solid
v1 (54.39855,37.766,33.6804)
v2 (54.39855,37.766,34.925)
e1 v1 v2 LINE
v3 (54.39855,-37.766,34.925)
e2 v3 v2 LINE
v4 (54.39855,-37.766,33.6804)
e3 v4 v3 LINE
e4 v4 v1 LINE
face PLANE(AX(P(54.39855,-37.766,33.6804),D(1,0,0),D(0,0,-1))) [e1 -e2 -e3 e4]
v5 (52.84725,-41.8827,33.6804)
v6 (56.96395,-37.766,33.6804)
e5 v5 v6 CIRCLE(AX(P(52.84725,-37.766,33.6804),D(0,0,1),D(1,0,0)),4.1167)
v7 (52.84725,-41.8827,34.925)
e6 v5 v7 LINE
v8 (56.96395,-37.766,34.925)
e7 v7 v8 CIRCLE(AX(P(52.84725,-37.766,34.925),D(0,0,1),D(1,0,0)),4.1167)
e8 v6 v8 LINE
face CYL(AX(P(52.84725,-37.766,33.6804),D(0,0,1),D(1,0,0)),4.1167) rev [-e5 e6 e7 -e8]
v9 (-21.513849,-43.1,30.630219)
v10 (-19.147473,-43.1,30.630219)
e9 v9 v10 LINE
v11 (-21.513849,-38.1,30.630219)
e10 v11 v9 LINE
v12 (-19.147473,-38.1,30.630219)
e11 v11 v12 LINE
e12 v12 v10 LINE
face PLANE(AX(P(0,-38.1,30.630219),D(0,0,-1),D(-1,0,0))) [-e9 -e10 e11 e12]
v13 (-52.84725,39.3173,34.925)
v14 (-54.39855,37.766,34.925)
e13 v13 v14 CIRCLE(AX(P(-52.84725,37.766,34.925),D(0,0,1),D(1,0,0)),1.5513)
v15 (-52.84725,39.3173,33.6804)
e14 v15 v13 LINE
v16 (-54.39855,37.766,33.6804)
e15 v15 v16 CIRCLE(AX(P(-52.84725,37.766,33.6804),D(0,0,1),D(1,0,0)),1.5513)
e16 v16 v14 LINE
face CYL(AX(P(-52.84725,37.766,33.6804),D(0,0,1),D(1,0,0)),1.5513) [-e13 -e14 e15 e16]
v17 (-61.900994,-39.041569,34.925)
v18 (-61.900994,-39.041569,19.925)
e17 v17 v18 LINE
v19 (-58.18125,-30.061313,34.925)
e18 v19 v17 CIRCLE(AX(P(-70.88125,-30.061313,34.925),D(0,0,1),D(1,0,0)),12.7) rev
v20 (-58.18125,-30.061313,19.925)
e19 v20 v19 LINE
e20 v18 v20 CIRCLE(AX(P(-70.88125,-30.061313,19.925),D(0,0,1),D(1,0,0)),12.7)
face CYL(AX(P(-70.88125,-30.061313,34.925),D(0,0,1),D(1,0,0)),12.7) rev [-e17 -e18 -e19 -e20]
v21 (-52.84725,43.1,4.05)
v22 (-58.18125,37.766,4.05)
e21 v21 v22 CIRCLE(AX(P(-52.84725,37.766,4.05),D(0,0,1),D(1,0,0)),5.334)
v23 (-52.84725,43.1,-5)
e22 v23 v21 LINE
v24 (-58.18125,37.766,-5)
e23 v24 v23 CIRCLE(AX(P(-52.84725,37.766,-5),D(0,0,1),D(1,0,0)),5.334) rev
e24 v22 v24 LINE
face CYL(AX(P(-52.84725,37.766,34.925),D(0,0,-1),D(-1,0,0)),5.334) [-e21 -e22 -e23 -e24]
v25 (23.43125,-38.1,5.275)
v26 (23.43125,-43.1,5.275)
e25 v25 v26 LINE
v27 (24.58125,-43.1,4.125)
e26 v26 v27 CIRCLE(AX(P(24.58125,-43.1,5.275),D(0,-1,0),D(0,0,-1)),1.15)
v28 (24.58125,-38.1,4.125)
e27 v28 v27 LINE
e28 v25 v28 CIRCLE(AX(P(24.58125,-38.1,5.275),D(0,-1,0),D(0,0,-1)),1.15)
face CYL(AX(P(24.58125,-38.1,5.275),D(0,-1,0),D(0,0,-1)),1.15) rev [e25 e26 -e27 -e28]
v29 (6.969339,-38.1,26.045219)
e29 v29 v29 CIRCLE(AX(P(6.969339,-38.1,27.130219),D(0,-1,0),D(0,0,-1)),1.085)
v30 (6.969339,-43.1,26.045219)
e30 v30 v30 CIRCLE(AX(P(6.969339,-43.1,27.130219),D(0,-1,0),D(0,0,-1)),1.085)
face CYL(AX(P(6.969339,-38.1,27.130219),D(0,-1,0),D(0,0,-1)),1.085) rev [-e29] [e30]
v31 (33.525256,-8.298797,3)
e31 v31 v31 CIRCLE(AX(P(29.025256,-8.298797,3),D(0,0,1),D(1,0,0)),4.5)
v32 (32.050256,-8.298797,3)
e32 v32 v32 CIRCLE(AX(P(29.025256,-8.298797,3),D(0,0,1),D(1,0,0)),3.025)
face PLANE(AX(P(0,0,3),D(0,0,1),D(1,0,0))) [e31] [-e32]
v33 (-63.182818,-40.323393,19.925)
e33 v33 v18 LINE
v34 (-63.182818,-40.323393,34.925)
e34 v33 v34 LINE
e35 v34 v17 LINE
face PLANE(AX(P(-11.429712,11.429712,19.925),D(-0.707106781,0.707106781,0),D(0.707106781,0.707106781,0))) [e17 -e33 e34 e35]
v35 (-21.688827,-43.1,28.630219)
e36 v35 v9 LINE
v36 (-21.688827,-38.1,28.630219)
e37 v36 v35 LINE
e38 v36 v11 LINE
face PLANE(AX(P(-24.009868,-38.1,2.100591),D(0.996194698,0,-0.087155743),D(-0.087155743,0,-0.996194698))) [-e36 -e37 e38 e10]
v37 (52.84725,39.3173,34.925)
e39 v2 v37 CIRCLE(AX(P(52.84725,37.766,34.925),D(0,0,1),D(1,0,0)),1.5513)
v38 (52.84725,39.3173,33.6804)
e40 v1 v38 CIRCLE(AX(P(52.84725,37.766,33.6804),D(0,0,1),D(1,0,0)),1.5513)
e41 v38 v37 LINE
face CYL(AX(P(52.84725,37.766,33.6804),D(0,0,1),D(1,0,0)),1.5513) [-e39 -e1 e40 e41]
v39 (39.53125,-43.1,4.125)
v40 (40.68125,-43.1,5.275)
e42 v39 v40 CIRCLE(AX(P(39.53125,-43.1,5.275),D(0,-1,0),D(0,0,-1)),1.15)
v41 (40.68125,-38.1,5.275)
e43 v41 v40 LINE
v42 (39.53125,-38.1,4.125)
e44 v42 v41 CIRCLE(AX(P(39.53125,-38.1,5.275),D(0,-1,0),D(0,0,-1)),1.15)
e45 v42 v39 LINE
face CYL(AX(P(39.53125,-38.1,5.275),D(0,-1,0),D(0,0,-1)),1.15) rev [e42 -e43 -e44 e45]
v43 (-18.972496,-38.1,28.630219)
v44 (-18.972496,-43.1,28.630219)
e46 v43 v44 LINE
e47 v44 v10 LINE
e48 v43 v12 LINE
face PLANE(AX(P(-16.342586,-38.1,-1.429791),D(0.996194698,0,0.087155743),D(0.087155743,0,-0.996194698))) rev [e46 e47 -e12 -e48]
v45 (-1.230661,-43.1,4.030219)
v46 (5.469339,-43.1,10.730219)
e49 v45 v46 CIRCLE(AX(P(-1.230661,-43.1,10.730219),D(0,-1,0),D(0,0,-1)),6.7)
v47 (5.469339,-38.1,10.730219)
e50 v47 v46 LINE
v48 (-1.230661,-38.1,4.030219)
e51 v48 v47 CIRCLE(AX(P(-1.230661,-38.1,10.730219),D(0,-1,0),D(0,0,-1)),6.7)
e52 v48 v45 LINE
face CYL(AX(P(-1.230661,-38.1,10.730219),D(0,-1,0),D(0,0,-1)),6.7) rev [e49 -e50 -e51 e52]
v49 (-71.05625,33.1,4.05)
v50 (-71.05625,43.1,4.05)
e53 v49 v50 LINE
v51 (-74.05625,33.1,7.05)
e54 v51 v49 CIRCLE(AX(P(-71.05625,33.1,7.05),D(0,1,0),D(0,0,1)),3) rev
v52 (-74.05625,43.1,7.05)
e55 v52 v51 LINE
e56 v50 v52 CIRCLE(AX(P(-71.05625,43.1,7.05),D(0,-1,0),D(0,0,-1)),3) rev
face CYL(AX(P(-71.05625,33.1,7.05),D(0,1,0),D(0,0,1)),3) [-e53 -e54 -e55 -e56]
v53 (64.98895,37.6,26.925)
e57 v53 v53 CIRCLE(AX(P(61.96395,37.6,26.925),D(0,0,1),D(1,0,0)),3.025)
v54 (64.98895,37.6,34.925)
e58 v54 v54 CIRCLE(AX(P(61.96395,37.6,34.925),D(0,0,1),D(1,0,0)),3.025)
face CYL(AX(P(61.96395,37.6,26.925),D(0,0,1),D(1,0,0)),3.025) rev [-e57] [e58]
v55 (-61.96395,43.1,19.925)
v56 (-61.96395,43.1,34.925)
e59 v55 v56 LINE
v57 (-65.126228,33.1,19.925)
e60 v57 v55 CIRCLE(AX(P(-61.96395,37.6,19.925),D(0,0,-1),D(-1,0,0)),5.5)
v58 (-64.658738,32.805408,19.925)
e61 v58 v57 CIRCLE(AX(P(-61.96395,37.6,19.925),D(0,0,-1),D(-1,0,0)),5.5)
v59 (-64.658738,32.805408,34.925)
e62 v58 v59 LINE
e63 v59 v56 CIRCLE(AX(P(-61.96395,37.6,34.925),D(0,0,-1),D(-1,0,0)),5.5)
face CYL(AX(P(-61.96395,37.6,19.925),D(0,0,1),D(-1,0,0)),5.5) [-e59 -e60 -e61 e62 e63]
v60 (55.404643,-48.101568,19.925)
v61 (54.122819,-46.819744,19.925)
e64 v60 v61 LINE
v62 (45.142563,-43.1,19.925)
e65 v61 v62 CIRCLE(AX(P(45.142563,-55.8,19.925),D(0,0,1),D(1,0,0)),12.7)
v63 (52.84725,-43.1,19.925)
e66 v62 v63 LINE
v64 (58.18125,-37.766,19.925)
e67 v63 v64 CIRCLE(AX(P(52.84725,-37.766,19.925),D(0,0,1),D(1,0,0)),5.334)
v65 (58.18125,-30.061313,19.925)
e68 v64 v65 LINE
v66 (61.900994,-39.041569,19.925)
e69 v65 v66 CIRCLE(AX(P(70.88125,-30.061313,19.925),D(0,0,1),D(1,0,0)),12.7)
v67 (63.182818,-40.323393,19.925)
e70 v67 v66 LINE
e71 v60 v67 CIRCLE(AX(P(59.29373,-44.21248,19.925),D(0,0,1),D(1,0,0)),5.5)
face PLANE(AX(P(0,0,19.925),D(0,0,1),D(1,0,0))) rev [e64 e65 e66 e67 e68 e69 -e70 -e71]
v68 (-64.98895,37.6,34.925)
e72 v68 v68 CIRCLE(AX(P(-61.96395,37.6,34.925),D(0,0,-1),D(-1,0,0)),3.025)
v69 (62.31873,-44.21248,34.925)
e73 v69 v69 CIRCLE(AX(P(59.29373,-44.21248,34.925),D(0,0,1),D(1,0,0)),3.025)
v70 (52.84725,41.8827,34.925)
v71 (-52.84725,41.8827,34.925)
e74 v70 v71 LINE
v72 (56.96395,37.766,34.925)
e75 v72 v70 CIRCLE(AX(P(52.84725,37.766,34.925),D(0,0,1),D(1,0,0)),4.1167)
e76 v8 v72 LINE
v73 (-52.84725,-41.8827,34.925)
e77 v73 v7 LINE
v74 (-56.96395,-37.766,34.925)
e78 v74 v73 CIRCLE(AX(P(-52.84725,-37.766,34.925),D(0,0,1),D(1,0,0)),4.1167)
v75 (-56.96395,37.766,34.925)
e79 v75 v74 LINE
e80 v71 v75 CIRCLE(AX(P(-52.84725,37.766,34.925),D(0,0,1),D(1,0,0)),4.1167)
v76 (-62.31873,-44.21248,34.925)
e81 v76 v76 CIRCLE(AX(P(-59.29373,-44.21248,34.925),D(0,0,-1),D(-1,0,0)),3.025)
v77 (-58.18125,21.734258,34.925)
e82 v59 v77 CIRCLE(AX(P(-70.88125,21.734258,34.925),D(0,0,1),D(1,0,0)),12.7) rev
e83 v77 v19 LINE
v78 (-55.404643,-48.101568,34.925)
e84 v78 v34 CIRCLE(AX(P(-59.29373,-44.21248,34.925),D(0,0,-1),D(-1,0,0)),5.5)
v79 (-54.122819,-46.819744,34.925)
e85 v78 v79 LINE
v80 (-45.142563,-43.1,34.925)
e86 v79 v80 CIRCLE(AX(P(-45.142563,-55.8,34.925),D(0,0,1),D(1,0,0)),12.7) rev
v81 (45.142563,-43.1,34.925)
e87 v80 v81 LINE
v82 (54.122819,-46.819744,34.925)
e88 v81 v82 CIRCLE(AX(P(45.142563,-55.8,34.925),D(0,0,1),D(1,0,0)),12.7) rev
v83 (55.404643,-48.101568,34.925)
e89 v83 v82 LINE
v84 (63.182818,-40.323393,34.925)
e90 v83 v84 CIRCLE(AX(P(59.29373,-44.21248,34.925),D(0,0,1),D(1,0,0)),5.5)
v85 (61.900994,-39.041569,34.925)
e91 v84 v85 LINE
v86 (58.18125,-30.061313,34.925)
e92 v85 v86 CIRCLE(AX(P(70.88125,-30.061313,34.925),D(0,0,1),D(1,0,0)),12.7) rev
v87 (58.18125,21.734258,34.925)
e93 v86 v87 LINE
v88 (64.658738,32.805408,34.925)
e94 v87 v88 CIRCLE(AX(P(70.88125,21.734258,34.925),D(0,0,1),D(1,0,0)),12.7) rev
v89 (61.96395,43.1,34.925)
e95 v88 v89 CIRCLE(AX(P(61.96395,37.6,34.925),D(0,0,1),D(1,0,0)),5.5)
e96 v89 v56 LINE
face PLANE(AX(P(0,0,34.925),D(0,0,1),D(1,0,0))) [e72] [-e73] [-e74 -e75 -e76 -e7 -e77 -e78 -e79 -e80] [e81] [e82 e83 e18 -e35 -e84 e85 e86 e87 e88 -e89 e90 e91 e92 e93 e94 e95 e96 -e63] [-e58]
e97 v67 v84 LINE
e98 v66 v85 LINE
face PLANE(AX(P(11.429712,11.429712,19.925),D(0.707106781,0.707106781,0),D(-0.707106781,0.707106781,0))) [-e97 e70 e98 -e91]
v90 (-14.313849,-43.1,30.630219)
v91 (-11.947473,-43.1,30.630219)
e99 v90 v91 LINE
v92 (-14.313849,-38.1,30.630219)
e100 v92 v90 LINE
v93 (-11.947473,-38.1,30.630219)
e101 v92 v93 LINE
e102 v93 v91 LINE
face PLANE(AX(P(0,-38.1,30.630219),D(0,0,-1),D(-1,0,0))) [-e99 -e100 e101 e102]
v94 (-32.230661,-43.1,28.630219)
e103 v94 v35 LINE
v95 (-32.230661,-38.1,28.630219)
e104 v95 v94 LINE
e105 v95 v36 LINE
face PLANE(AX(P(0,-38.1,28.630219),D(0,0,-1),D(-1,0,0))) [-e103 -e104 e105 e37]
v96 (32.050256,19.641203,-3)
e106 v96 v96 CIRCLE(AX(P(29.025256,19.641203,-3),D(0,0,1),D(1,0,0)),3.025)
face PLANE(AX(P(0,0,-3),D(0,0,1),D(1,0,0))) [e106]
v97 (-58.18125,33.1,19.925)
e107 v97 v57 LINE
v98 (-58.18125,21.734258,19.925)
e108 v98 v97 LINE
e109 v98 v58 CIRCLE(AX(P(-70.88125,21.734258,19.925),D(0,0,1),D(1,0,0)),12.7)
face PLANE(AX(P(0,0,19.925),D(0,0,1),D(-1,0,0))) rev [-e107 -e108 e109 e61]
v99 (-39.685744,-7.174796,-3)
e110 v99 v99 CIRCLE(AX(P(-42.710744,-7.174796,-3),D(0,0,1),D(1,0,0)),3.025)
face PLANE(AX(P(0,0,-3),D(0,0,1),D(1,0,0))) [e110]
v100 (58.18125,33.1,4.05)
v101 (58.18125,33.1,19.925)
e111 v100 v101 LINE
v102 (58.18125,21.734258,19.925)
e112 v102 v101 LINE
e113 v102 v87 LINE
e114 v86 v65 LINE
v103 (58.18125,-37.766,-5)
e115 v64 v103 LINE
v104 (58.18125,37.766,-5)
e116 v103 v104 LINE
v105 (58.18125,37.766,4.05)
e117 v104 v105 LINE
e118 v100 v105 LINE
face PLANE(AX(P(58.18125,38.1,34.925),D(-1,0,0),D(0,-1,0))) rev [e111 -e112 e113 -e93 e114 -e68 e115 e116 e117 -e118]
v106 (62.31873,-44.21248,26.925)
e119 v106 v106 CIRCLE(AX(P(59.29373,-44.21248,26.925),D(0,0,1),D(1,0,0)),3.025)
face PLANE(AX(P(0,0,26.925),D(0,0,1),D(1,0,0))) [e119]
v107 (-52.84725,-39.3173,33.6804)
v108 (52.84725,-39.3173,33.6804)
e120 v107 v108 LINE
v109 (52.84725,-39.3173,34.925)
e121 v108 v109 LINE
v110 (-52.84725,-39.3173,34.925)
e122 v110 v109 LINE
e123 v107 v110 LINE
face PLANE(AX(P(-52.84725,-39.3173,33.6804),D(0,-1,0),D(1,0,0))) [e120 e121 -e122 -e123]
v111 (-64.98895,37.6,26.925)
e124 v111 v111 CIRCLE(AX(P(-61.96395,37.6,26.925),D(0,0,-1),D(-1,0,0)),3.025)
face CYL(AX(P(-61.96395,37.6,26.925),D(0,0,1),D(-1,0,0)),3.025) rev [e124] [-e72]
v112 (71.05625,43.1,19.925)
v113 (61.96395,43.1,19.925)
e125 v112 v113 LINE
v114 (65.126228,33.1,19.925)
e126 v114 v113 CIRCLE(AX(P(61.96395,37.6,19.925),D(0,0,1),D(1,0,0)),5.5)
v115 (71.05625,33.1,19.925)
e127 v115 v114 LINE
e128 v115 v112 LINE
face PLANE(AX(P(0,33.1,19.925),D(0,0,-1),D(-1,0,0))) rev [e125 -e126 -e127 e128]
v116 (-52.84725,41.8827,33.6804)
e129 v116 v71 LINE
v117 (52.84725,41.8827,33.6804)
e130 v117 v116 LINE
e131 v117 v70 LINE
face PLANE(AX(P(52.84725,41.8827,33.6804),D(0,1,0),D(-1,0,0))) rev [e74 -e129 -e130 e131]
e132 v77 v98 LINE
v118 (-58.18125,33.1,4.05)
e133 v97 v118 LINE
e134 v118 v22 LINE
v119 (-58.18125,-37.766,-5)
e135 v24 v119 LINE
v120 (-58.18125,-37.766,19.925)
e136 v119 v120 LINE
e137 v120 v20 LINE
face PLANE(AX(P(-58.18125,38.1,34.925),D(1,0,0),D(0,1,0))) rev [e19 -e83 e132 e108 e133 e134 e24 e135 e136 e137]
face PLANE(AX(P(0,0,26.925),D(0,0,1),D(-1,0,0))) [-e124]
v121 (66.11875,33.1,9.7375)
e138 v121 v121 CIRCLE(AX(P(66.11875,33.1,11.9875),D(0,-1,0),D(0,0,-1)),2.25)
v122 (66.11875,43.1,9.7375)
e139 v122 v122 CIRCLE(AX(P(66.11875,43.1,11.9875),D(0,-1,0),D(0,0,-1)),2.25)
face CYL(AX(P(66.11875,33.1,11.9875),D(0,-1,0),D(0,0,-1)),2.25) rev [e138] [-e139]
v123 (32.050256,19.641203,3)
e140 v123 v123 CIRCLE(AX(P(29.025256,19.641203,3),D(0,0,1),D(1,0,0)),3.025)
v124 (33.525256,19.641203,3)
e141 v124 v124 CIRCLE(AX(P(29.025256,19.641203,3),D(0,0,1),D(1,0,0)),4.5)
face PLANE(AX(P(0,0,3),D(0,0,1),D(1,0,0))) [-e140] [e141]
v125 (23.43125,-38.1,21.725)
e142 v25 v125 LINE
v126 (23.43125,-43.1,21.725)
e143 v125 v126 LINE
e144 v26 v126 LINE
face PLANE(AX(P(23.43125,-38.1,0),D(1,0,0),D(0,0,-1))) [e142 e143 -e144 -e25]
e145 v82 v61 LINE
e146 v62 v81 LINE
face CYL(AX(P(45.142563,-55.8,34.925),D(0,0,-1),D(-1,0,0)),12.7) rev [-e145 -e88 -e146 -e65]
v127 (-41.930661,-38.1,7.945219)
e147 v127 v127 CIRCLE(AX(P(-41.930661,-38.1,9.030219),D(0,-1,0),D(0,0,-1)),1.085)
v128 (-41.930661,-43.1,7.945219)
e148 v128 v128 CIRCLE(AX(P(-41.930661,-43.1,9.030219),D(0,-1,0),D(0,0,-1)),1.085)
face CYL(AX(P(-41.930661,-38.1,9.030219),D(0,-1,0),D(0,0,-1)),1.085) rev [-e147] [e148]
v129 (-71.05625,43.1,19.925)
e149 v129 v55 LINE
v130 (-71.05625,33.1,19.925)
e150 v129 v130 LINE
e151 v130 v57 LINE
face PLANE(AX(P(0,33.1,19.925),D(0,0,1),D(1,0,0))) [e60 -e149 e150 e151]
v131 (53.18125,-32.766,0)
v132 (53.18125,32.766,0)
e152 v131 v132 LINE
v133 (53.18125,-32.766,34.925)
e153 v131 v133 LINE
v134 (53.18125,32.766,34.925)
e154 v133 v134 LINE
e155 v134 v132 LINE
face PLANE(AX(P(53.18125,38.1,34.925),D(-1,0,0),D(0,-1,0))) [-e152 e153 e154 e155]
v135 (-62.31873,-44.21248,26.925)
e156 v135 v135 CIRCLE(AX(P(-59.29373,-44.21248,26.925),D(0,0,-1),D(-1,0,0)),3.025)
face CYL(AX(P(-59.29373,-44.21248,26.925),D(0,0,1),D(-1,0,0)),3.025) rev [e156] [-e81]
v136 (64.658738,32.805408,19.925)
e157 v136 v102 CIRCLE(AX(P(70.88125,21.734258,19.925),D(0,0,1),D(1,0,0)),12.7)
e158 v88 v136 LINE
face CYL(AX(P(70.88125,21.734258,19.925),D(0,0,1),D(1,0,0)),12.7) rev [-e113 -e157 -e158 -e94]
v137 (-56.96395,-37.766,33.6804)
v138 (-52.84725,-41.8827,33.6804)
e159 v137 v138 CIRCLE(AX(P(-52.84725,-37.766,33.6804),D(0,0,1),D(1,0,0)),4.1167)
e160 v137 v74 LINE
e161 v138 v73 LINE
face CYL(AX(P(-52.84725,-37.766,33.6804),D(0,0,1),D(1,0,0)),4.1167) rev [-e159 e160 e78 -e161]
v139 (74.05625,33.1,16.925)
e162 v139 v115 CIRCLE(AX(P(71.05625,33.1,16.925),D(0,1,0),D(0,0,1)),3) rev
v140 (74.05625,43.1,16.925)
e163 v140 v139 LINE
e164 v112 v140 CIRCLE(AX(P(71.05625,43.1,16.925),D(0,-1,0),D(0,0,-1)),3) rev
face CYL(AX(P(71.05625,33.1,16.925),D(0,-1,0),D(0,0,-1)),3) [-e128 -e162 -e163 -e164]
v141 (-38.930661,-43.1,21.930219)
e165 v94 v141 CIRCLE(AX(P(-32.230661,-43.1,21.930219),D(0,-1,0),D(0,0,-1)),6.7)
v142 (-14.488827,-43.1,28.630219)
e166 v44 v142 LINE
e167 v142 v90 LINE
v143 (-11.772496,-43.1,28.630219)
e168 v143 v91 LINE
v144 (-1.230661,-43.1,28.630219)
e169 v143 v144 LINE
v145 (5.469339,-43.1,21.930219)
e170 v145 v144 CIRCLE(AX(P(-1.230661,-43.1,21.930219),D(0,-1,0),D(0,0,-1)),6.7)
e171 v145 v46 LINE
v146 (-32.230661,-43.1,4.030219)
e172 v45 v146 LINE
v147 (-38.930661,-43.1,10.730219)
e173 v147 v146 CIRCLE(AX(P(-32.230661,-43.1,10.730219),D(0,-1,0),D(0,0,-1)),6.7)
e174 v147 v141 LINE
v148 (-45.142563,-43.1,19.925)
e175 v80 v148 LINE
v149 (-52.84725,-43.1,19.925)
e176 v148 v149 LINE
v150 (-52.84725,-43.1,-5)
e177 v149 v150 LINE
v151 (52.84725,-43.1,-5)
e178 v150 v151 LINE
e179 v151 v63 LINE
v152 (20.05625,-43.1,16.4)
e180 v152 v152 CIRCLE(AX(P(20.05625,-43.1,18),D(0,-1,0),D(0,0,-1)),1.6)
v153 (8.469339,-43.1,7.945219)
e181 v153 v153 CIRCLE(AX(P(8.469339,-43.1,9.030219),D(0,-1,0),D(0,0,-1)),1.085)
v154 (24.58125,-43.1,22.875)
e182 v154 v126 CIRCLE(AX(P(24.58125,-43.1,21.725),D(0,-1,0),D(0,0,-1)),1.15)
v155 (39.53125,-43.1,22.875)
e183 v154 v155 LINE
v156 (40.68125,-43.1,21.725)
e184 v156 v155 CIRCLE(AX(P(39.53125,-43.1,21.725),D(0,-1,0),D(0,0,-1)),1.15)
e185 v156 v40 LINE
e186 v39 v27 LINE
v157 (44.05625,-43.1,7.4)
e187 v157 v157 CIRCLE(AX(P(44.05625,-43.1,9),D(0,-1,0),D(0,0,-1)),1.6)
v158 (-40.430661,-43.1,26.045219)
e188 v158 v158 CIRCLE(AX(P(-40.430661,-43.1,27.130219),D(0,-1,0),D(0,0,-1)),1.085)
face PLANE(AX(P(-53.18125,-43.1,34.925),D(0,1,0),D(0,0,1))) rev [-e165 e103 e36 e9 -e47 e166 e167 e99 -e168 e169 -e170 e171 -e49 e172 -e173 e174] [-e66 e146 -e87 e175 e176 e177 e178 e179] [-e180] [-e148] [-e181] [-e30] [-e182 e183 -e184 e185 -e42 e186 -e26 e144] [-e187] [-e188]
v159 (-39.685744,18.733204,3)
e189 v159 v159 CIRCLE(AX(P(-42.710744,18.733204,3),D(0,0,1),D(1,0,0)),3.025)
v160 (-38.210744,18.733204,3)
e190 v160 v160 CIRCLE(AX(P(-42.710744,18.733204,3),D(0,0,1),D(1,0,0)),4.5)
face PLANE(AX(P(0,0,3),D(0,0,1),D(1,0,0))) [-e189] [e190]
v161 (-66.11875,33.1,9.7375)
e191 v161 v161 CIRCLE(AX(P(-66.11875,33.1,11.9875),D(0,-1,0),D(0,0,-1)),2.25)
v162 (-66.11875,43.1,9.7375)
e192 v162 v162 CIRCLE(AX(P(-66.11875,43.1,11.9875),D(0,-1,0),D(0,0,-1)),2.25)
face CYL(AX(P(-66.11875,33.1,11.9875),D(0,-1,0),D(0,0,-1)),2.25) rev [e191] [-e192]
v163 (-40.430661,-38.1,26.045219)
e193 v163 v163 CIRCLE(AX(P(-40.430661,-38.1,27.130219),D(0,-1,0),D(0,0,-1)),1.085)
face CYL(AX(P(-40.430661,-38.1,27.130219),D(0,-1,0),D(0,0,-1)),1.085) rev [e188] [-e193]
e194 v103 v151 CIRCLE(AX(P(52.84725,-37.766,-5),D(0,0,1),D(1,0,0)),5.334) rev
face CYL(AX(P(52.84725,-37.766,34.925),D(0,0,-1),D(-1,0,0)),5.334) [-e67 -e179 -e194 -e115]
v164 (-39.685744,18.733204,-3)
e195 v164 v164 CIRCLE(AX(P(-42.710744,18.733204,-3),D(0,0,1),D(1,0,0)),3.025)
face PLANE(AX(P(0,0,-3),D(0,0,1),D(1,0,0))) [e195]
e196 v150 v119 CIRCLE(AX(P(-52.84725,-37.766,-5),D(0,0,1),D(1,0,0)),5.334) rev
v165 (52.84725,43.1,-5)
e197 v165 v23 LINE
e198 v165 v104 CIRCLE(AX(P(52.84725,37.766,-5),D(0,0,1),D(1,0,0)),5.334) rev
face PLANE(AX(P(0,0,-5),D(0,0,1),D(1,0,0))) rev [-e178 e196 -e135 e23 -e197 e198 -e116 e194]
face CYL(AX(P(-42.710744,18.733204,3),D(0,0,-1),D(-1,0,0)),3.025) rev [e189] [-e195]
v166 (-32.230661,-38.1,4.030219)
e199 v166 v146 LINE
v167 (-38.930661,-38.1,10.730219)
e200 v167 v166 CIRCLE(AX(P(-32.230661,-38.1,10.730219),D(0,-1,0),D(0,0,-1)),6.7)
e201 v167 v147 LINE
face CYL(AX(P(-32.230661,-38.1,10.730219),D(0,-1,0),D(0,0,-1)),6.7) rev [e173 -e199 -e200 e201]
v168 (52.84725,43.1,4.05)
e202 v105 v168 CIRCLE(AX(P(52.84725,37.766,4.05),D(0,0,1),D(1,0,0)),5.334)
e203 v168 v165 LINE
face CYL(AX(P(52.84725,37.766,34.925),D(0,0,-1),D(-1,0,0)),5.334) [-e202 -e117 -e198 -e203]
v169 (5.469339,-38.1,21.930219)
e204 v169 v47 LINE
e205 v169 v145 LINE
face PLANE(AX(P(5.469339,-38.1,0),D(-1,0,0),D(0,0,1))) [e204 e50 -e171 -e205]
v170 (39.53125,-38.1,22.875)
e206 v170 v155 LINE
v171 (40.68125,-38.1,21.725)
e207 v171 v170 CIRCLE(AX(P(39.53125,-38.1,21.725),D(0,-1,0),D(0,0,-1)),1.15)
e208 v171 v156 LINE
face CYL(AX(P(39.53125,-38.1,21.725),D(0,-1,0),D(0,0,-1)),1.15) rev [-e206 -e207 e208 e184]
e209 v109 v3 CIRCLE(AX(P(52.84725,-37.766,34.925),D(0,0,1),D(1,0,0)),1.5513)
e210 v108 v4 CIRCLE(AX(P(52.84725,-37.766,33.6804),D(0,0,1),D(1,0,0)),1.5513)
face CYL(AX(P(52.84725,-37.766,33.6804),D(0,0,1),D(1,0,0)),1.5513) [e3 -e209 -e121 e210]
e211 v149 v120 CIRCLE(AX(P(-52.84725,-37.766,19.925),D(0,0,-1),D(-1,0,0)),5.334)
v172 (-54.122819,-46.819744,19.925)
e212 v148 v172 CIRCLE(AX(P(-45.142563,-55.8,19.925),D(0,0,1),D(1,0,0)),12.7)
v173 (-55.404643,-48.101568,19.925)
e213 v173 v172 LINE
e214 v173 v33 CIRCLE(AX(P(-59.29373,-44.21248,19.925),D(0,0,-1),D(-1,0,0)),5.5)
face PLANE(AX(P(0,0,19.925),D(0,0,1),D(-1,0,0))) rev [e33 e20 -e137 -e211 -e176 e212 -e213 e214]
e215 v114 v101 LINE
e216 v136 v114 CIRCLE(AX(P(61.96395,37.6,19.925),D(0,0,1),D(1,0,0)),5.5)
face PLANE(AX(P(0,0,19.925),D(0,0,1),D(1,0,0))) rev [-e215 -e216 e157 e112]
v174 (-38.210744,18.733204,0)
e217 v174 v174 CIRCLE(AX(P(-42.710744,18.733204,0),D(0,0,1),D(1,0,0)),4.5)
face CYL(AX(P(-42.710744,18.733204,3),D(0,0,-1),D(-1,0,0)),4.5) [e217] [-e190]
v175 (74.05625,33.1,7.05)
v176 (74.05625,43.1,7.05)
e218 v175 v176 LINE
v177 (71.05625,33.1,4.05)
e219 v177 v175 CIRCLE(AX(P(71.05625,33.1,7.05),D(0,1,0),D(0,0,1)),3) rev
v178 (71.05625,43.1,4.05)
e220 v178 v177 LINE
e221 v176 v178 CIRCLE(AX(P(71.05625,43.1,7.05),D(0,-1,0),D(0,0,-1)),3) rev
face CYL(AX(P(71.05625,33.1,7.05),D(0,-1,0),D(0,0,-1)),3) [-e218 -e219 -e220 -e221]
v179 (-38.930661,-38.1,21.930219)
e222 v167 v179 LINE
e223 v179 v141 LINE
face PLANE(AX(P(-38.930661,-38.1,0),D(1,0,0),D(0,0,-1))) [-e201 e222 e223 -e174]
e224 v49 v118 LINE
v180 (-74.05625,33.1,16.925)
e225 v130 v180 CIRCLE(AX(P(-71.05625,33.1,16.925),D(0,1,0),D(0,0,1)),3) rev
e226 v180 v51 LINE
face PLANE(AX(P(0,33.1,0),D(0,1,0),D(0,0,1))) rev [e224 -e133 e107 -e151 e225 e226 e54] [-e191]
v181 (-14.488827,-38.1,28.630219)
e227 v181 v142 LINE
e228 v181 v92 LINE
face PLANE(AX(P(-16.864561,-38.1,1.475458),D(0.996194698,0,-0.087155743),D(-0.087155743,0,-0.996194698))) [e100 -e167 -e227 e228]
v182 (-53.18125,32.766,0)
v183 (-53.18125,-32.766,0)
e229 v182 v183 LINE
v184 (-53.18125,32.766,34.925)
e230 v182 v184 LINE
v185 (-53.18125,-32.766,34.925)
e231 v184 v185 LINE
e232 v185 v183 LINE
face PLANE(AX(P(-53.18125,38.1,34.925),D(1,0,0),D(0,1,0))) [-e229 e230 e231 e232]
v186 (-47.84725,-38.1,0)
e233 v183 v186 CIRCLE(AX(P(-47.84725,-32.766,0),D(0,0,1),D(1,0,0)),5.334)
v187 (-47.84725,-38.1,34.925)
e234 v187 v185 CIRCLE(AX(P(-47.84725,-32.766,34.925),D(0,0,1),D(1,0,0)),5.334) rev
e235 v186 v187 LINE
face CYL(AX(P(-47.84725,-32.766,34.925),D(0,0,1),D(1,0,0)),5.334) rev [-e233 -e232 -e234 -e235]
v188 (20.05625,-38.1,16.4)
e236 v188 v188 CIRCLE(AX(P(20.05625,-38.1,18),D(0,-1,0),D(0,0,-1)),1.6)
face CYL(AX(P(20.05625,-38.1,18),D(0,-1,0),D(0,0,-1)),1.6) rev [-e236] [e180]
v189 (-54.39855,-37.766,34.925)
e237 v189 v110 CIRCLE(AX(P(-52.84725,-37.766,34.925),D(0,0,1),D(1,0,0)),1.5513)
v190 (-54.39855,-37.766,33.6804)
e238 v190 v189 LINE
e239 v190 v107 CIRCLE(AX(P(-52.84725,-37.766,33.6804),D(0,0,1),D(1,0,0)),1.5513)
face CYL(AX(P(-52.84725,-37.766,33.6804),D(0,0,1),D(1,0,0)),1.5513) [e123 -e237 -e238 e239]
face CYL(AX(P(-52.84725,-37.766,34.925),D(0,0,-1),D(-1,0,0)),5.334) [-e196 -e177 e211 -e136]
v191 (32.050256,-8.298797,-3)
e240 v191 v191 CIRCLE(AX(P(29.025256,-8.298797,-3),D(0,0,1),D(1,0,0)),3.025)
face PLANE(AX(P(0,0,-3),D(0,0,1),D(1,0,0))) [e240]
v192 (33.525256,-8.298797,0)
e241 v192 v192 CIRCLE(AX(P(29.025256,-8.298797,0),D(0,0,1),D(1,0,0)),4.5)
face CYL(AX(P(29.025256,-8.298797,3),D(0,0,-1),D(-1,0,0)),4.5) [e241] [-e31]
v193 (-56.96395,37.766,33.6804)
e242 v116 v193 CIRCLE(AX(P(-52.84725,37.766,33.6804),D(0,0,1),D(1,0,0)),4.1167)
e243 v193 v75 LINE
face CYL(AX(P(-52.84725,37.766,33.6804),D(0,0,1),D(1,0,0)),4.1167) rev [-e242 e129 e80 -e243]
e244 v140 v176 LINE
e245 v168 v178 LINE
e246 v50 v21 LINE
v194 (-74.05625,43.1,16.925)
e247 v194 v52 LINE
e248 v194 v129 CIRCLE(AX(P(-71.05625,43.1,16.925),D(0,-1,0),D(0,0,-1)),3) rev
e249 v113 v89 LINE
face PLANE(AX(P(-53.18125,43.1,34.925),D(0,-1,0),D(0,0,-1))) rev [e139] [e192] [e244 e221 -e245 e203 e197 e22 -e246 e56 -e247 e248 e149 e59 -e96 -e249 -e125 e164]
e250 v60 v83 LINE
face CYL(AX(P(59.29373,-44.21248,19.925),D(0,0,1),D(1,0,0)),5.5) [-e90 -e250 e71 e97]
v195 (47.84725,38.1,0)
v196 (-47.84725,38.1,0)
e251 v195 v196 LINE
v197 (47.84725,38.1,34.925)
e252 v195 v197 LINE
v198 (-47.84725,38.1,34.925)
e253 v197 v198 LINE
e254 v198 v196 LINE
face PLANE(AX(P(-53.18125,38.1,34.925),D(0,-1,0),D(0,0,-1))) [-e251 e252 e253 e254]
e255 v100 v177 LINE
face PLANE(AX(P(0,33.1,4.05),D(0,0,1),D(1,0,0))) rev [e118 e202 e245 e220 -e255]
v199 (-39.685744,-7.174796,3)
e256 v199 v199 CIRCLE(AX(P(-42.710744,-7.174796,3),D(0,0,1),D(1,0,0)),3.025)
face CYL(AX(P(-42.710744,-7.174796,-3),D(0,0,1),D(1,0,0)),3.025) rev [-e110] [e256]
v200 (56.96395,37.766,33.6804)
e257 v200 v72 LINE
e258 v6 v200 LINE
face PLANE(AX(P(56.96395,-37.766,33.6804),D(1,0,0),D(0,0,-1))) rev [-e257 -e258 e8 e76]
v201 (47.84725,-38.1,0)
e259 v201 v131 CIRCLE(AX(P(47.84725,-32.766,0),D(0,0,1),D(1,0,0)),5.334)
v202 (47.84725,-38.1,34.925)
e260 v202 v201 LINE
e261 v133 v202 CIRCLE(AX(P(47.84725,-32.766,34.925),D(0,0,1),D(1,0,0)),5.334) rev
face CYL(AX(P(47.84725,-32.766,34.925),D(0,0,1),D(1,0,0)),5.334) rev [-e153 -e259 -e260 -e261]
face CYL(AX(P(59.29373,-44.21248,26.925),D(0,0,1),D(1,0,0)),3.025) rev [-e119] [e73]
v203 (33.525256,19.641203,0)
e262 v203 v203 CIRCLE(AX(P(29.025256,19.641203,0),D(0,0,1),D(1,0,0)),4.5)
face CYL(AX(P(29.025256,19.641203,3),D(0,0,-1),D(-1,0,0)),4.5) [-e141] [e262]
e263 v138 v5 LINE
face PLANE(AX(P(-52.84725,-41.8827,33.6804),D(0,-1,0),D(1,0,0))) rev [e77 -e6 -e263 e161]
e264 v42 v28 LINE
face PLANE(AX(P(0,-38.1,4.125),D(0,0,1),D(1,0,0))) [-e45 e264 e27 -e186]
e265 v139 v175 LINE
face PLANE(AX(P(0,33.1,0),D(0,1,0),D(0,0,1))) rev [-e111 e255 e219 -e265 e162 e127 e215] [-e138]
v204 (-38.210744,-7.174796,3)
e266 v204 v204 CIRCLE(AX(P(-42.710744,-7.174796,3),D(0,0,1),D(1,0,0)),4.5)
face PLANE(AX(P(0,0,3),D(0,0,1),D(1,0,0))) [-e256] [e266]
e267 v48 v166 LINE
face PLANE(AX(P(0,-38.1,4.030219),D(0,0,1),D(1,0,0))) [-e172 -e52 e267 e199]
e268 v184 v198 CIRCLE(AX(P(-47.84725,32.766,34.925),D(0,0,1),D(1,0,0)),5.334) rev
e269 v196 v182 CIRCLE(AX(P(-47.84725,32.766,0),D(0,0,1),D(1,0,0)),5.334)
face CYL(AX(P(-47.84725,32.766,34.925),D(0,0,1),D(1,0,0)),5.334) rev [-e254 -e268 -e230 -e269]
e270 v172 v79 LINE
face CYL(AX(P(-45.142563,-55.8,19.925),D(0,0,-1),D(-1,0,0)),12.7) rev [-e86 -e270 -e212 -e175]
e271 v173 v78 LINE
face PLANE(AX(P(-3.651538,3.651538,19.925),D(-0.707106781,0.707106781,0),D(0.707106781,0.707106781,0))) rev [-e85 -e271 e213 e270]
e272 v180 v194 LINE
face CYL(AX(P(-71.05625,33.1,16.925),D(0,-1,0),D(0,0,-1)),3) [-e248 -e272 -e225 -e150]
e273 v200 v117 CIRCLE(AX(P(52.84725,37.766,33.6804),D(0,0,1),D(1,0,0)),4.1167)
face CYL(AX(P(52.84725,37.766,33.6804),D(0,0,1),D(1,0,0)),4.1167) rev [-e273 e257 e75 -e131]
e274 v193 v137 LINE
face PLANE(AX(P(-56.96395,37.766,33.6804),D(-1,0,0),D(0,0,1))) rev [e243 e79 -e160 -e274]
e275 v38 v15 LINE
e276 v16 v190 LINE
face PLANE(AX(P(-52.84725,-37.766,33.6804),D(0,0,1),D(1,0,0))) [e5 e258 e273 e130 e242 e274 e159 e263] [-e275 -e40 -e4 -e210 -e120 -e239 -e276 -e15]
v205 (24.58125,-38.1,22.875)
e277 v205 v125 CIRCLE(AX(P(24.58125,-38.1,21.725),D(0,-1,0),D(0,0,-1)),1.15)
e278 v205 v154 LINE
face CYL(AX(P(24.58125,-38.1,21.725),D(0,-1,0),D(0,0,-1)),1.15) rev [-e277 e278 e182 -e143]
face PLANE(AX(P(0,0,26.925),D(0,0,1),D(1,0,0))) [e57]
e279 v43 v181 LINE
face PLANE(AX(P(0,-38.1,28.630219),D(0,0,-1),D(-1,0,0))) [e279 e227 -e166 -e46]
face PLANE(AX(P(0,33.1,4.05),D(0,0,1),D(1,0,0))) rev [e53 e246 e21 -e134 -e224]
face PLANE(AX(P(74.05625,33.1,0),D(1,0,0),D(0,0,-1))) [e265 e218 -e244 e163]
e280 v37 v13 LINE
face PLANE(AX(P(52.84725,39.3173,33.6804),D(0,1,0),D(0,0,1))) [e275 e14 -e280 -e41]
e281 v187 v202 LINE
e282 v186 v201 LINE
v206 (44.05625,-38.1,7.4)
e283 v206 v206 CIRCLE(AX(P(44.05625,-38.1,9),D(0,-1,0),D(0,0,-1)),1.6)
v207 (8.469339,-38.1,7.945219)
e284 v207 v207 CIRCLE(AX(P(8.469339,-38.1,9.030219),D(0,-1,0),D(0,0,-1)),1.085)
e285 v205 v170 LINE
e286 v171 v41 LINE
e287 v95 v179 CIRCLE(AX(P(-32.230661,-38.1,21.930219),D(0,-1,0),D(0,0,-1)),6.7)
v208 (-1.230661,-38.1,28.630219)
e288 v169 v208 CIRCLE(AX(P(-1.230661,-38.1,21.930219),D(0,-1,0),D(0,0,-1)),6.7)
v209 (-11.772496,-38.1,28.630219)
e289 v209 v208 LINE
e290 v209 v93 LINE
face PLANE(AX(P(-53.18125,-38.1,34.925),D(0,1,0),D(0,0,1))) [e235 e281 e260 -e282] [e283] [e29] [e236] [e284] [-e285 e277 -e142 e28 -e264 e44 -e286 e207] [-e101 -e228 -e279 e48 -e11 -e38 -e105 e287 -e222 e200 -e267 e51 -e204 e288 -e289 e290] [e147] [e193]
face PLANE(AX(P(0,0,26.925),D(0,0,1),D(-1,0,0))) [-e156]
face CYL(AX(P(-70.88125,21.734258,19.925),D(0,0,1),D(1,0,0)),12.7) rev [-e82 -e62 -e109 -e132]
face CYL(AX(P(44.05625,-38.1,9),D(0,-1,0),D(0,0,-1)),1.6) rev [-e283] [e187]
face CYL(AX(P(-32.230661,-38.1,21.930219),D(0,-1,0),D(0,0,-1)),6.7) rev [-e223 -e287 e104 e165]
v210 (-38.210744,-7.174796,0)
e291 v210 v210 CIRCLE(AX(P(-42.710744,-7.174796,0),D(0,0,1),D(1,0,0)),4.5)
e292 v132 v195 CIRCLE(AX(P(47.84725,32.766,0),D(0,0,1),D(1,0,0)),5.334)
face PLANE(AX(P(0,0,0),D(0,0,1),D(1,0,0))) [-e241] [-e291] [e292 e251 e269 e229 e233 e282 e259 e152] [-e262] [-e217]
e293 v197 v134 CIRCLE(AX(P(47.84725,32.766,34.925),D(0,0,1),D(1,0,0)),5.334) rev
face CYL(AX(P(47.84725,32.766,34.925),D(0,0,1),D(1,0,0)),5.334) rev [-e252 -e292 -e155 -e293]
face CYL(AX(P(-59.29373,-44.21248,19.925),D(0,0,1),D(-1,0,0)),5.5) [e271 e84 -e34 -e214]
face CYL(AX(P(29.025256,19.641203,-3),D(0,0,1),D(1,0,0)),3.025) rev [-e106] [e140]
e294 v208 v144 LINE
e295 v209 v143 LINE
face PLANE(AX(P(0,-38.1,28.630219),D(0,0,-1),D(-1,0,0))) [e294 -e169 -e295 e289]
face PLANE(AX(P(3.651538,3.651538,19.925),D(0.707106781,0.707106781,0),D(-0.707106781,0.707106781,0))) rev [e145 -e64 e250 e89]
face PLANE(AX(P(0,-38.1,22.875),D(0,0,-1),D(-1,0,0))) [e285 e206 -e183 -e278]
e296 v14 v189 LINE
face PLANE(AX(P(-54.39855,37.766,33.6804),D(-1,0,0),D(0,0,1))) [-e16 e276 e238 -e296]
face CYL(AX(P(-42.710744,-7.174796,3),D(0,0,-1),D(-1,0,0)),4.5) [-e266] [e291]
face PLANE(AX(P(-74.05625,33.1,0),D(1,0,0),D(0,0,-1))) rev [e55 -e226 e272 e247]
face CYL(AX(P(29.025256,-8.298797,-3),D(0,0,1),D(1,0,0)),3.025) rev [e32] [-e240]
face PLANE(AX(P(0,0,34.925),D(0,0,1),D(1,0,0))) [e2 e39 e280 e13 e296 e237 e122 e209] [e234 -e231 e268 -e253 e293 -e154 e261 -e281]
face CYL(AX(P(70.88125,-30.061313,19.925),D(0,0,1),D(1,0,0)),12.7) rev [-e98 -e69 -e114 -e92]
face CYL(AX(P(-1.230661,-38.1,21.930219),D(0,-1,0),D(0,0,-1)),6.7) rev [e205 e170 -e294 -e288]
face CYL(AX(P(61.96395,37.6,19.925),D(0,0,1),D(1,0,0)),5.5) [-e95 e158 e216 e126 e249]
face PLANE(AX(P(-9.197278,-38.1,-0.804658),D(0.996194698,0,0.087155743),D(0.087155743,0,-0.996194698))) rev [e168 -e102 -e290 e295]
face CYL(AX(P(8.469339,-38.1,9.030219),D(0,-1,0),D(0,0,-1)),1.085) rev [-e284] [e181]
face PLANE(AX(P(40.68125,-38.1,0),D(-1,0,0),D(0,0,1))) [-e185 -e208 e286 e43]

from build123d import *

# Parameters (mm, degrees)
SKETCH1_W             = 106.3625
SKETCH1_H             = 76.2
BOSS_EXTRUDE1_DEPTH   = 34.925
SHELL1_T              = 5
FILLET1_R             = 5.334
CUT_EXTRUDE1_DEPTH    = 1.2446
BOSS_EXTRUDE2_DEPTH   = 15
BOSS_EXTRUDE2_2_DEPTH = 15
SKETCH5_R             = 3.025
CUT_EXTRUDE4_DEPTH    = 8
FILLET2_R             = 12.7
SKETCH6_R             = 4.5
SKETCH6_R_2           = 3.025
BOSS_EXTRUDE3_DEPTH   = 3
CUT_EXTRUDE5_START    = -6
SKETCH7_R             = 3.025
CUT_EXTRUDE5_DEPTH    = 6
BOSS_EXTRUDE4_DEPTH   = 10
BOSS_EXTRUDE5_REACH   = 125.767
SKETCH9_W             = 5.334
SKETCH9_H             = 15.875
FILLET3_R             = 3
BOSS_EXTRUDE6_REACH   = 125.767
SKETCH12_W            = 5.334
SKETCH12_H            = 15.875
M4_CLEARANCE_HOLE1_D  = 4.5
SKETCH13_R            = 1.6
CUT_EXTRUDE6_DEPTH    = 5


with BuildPart() as part:
    # Sketch1 → Boss-Extrude1 (new body)
    with BuildSketch(Plane.XY):
        Rectangle(SKETCH1_W, SKETCH1_H)
    extrude(amount=BOSS_EXTRUDE1_DEPTH)

    # Shell1
    shell1_openings = [part.faces().sort_by_distance(p)[0] for p in [
        (0, 0, 34.925),
    ]]
    offset(amount=SHELL1_T, openings=shell1_openings, kind=Kind.INTERSECTION)

    # Fillet1
    # the kernel refuses this fillet: 5.334 mm, written as the material it adds along each edge
    with BuildSketch(Plane(origin=(53.18125, -38.1, 0), x_dir=(0, 1, 0), z_dir=(0, 0, 1)), Plane(origin=(53.18125, 38.1, 0), x_dir=(-1, 0, 0), z_dir=(0, 0, 1)), Plane(origin=(-53.18125, -38.1, 0), x_dir=(1, 0, 0), z_dir=(0, 0, 1))) as fillet1_piece_1:
        with BuildLine():
            CenterArc((FILLET1_R, FILLET1_R), FILLET1_R, 180, 90)
            Line((0, FILLET1_R), (0, 0))
            Line((0, 0), (FILLET1_R, 0))
        make_face()
    extrude(amount=34.925)
    with BuildSketch(Plane(origin=(-53.18125, 38.1, 0), x_dir=(1, 0, 0), z_dir=(0, 0, 1))) as fillet1_piece_2:
        with BuildLine():
            CenterArc((FILLET1_R, -FILLET1_R), FILLET1_R, 90, 90)
            Line((0, -FILLET1_R), (0, 0))
            Line((0, 0), (FILLET1_R, 0))
        make_face()
    extrude(amount=34.925)
    # the kernel refuses this fillet: 5.334 mm, written as the material it takes off along each edge
    with BuildSketch(Plane(origin=(58.18125, -43.1, 48.26), x_dir=(-1, 0, 0), z_dir=(0, 0, -1)), Plane(origin=(-58.18125, 43.1, -18.335), x_dir=(0, -1, 0), z_dir=(0, 0, 1))) as fillet1_2_piece_1:
        with BuildLine():
            CenterArc((FILLET1_R, FILLET1_R), FILLET1_R, 180, 90)
            Line((0, FILLET1_R), (0, 0))
            Line((0, 0), (FILLET1_R, 0))
        make_face()
    extrude(amount=66.595, mode=Mode.SUBTRACT)
    with BuildSketch(Plane(origin=(-58.18125, -43.1, 48.26), x_dir=(1, 0, 0), z_dir=(0, 0, -1)), Plane(origin=(58.18125, 43.1, 48.26), x_dir=(-1, 0, 0), z_dir=(0, 0, -1))) as fillet1_2_piece_2:
        with BuildLine():
            CenterArc((FILLET1_R, -FILLET1_R), FILLET1_R, 90, 90)
            Line((0, -FILLET1_R), (0, 0))
            Line((0, 0), (FILLET1_R, 0))
        make_face()
    extrude(amount=66.595, mode=Mode.SUBTRACT)

    # Sketch2 → Cut-Extrude1 (cut)
    with BuildSketch(Plane.XY.offset(34.925)):
        with BuildLine():
            Line((-52.84725, -41.8827), (52.84725, -41.8827))
            ThreePointArc((52.84725, -41.8827), (55.758196486, -40.676946486), (56.96395, -37.766))
            Line((56.96395, -37.766), (56.96395, 37.766))
            ThreePointArc((56.96395, 37.766), (55.758196486, 40.676946486), (52.84725, 41.8827))
            Line((52.84725, 41.8827), (-52.84725, 41.8827))
            ThreePointArc((-52.84725, 41.8827), (-55.758196486, 40.676946486), (-56.96395, 37.766))
            Line((-56.96395, 37.766), (-56.96395, -37.766))
            ThreePointArc((-56.96395, -37.766), (-55.758196486, -40.676946486), (-52.84725, -41.8827))
        make_face()
        with BuildLine():
            Line((-54.39855, 37.766), (-54.39855, -37.766))
            ThreePointArc((-54.39855, -37.766), (-53.94418475, -38.86293475), (-52.84725, -39.3173))
            Line((-52.84725, -39.3173), (52.84725, -39.3173))
            ThreePointArc((52.84725, -39.3173), (53.94418475, -38.86293475), (54.39855, -37.766))
            Line((54.39855, -37.766), (54.39855, 37.766))
            ThreePointArc((54.39855, 37.766), (53.94418475, 38.86293475), (52.84725, 39.3173))
            Line((52.84725, 39.3173), (-52.84725, 39.3173))
            ThreePointArc((-52.84725, 39.3173), (-53.94418475, 38.86293475), (-54.39855, 37.766))
        make_face(mode=Mode.SUBTRACT)
    extrude(amount=-CUT_EXTRUDE1_DEPTH, mode=Mode.SUBTRACT)


with BuildPart() as body_2:
    # Sketch4 → Boss-Extrude2 (new body)
    with BuildSketch(Plane.XY.offset(34.925)):
        with BuildLine():
            ThreePointArc((52.84725, 43.1), (56.618957571, 41.537707571), (58.18125, 37.766))
            Line((58.18125, 37.766), (58.18125, 32.1))
            Line((58.18125, 32.1), (61.96395, 32.1))
            ThreePointArc((61.96395, 32.1), (67.46395, 37.6), (61.96395, 43.1))
            Line((61.96395, 43.1), (52.84725, 43.1))
        make_face()
    extrude(amount=-BOSS_EXTRUDE2_DEPTH)


with BuildPart() as body_3:
    # Sketch4 → Boss-Extrude2 2 (new body)
    with BuildSketch(Plane.XY.offset(34.925)):
        with BuildLine():
            Line((63.182817689, -40.323393096), (58.18125, -35.321825407))
            Line((58.18125, -35.321825407), (58.18125, -37.766))
            ThreePointArc((58.18125, -37.766), (57.775223426, -39.807233428), (56.618957571, -41.537707571))
            ThreePointArc((56.618957571, -41.537707571), (54.888483428, -42.693973426), (52.84725, -43.1))
            Line((52.84725, -43.1), (50.403075407, -43.1))
            Line((50.403075407, -43.1), (55.404643096, -48.101567689))
            ThreePointArc((55.404643096, -48.101567689), (63.182817689, -48.101567689), (63.182817689, -40.323393096))
        make_face()
    extrude(amount=-BOSS_EXTRUDE2_2_DEPTH)


with BuildPart() as cut_extrude4_tool:
    # Sketch5 → Cut-Extrude4 (new body)
    with BuildSketch(Plane.XY.offset(34.925)):
        with Locations((59.293730392, -44.212480392)):
            Circle(SKETCH5_R)
        with Locations((61.96395, 37.6)):
            Circle(SKETCH5_R)
    extrude(amount=-CUT_EXTRUDE4_DEPTH)


with BuildPart() as body_2_1:
    add(body_2.part)

    # Cut-Extrude4: cut by cut_extrude4_tool
    add(cut_extrude4_tool.part, mode=Mode.SUBTRACT)


with BuildPart() as body_3_1:
    add(body_3.part)

    # Cut-Extrude4: cut by cut_extrude4_tool
    add(cut_extrude4_tool.part, mode=Mode.SUBTRACT)


with BuildPart() as body_4:
    # Mirror3: mirrored copy
    add(body_3_1.part.mirror(Plane(origin=(0, 0, 0), x_dir=(0, 0, 1), z_dir=(1, 0, 0))))


with BuildPart() as body_5:
    # Mirror3 2: mirrored copy
    add(body_2_1.part.mirror(Plane(origin=(0, 0, 0), x_dir=(0, 0, 1), z_dir=(1, 0, 0))))


with BuildPart() as part_1:
    add(part.part)

    # Combine3: union body 3, body 2, body 4, body 5
    add(body_3_1.part)
    add(body_2_1.part)
    add(body_4.part)
    add(body_5.part)

    # Fillet2
    # the kernel refuses this fillet: 12.7 mm, written as the material it adds along each edge
    with BuildSketch(Plane(origin=(-58.18125, 32.1, 34.925), x_dir=(-0.9941224670877488, 0.10826135243644415, 0), z_dir=(0, 0, -1))) as fillet2_piece_1_section:
        with BuildLine():
            CenterArc((11.503146113, -11.67973592), FILLET2_R, 113.1229538, 60.661946359)
            Line((-1.122209219, -10.304816744), (-2.384744752, -10.167324826))
            Line((-2.384744752, -10.167324826), (-1.262535533, 0.137491918))
            Line((-1.262535533, 0.137491918), (0.137491918, 1.262535533))
            ThreePointArc((0.137491918, 1.262535533), (3.897958974, 0.853015315), (6.017049113, 1.167973592))
            Line((6.017049113, 1.167973592), (6.515785204, 0))
        make_face()
    fillet2_piece_1 = extrude(amount=15, mode=Mode.PRIVATE)
    fillet2_piece_1 = split(fillet2_piece_1, bisect_by=Plane(origin=(-56.96395, 28.160512579, 34.3027), z_dir=(-1, 0, 0)), keep=Keep.TOP, mode=Mode.PRIVATE)
    add(fillet2_piece_1)
    with BuildSketch(Plane(origin=(-50.403075407, -43.1, 34.925), x_dir=(-0.7071067811865475, -0.7071067811865475, 0), z_dir=(0, 0, -1)), Plane(origin=(-58.18125, -35.321825407, 34.925), x_dir=(0, 1, 0), z_dir=(0, 0, -1)), Plane(origin=(58.18125, -35.321825407, 34.925), x_dir=(0.7071067811865468, -0.7071067811865482, 0), z_dir=(0, 0, -1))) as fillet2_piece_2:
        with BuildLine():
            CenterArc((FILLET2_R * 0.414213562373, -FILLET2_R), FILLET2_R, 90, 45)
            Line((-FILLET2_R * 0.292893218813, -FILLET2_R * 0.292893218813), (0, 0))
            Line((0, 0), (FILLET2_R * 0.414213562373, 0))
        make_face()
    extrude(amount=15)
    with BuildSketch(Plane(origin=(50.403075407, -43.1, 34.925), x_dir=(0.7071067811865475, -0.7071067811865475, 0), z_dir=(0, 0, -1))) as fillet2_piece_3:
        with BuildLine():
            CenterArc((FILLET2_R * 0.414213562373, FILLET2_R), FILLET2_R, 225, 45)
            Line((-FILLET2_R * 0.292893218813, FILLET2_R * 0.292893218813), (0, 0))
            Line((0, 0), (FILLET2_R * 0.414213562373, 0))
        make_face()
    extrude(amount=15)
    with BuildSketch(Plane(origin=(58.18125, 32.1, 34.925), x_dir=(0, -1, 0), z_dir=(0, 0, -1))) as fillet2_piece_4_section:
        with BuildLine():
            CenterArc((10.365741732, -12.7), FILLET2_R, 90, 60.661946359)
            Line((-0.705407718, -6.477488462), (-1.812522663, -5.855237308))
            ThreePointArc((-1.812522663, -5.855237308), (-1.27, -3.7827), (-1.27, 0))
            Line((-1.27, 0), (0, 1.27))
            Line((0, 1.27), (10.365741732, 1.27))
            Line((10.365741732, 1.27), (10.365741732, 0))
        make_face()
    fillet2_piece_4 = extrude(amount=15, mode=Mode.PRIVATE)
    fillet2_piece_4 = split(fillet2_piece_4, bisect_by=Plane(origin=(56.96395, 28.160512579, 34.3027), z_dir=(1, 0, 0)), keep=Keep.TOP, mode=Mode.PRIVATE)
    add(fillet2_piece_4)

    # Sketch6 → Boss-Extrude3 (add)
    # profile 1 of 7: a face of its own
    with BuildSketch(Plane.XY):
        with Locations((29.025256116, -8.298796641)):
            Circle(SKETCH6_R)
        with Locations((29.025256116, -8.298796641)):
            Circle(SKETCH6_R_2, mode=Mode.SUBTRACT)
    # profile 2 of 7: a face of its own
    with BuildSketch(Plane.XY):
        with Locations((29.025256116, -8.298796641)):
            Circle(SKETCH6_R_2)
    # profile 3 of 7: a face of its own
    with BuildSketch(Plane.XY):
        with Locations((29.025256449, 19.641203359)):
            Circle(SKETCH6_R)
        with Locations((29.025256449, 19.641203359)):
            Circle(SKETCH6_R_2, mode=Mode.SUBTRACT)
    # profile 4 of 7: a face of its own
    with BuildSketch(Plane.XY):
        with Locations((29.025256449, 19.641203359)):
            Circle(SKETCH6_R_2)
    # profile 5 of 7: a face of its own
    with BuildSketch(Plane.XY):
        with Locations((-42.71074387, -7.174795785)):
            Circle(SKETCH6_R)
        with Locations((-42.71074387, -7.174795785)):
            Circle(SKETCH6_R_2, mode=Mode.SUBTRACT)
    # profile 6 of 7: a face of its own
    with BuildSketch(Plane.XY):
        with Locations((-42.71074387, -7.174795785)):
            Circle(SKETCH6_R_2)
    # profile 7 of 7: a face of its own
    with BuildSketch(Plane.XY):
        with Locations((-42.710743561, 18.733204215)):
            Circle(SKETCH6_R)
        with Locations((-42.710743561, 18.733204215)):
            Circle(SKETCH6_R_2, mode=Mode.SUBTRACT)
    extrude(amount=BOSS_EXTRUDE3_DEPTH)

    # Sketch7 → Cut-Extrude5 (cut)
    with BuildSketch(Plane.XY.offset(3).offset(CUT_EXTRUDE5_START)):
        with Locations((-42.710743561, 18.733204215)):
            Circle(SKETCH7_R)
        with Locations((-42.71074387, -7.174795785)):
            Circle(SKETCH7_R)
        with Locations((29.025256449, 19.641203359)):
            Circle(SKETCH7_R)
        with Locations((29.025256116, -8.298796641)):
            Circle(SKETCH7_R)
    extrude(amount=CUT_EXTRUDE5_DEPTH, mode=Mode.SUBTRACT)

    # Sketch8 → Boss-Extrude4 (add)
    with BuildSketch(Plane(origin=(0, 43.1, 0), x_dir=(1, 0, 0), z_dir=(0, 1, 0))):
        with BuildLine():
            Line((-58.18125, -19.925), (-58.18125, -4.05))
            Line((-58.18125, -4.05), (-64.704536438, -10.573286438))
            ThreePointArc((-64.704536438, -10.573286438), (-64.270990935, -11.222133135), (-64.11875, -11.9875))
            ThreePointArc((-64.11875, -11.9875), (-65.353383135, -13.835259065), (-67.532963562, -13.401713562))
            Line((-67.532963562, -13.401713562), (-74.05625, -19.925))
            Line((-74.05625, -19.925), (-58.18125, -19.925))
        make_face()
        with BuildLine():
            Line((-64.704536438, -10.573286438), (-58.18125, -4.05))
            Line((-58.18125, -4.05), (-74.05625, -4.05))
            Line((-74.05625, -4.05), (-74.05625, -19.925))
            Line((-74.05625, -19.925), (-67.532963562, -13.401713562))
            ThreePointArc((-67.532963562, -13.401713562), (-67.532963562, -10.573286438), (-64.704536438, -10.573286438))
        make_face()
        with BuildLine():
            ThreePointArc((-64.11875, -11.9875), (-64.270990935, -11.222133135), (-64.704536438, -10.573286438))
            Line((-64.704536438, -10.573286438), (-67.532963562, -13.401713562))
            ThreePointArc((-67.532963562, -13.401713562), (-65.353383135, -13.835259065), (-64.11875, -11.9875))
        make_face()
        with BuildLine():
            Line((-67.532963562, -13.401713562), (-64.704536438, -10.573286438))
            ThreePointArc((-64.704536438, -10.573286438), (-67.532963562, -10.573286438), (-67.532963562, -13.401713562))
        make_face()
        with BuildLine():
            Line((74.05625, -4.05), (58.18125, -4.05))
            Line((58.18125, -4.05), (58.18125, -19.925))
            Line((58.18125, -19.925), (64.704536438, -13.401713562))
            ThreePointArc((64.704536438, -13.401713562), (64.704536438, -10.573286438), (67.532963562, -10.573286438))
            Line((67.532963562, -10.573286438), (74.05625, -4.05))
        make_face()
        with BuildLine():
            ThreePointArc((67.532963562, -10.573286438), (64.704536438, -10.573286438), (64.704536438, -13.401713562))
            Line((64.704536438, -13.401713562), (67.532963562, -10.573286438))
        make_face()
        with BuildLine():
            Line((67.532963562, -10.573286438), (64.704536438, -13.401713562))
            ThreePointArc((64.704536438, -13.401713562), (66.884116865, -13.835259065), (68.11875, -11.9875))
            ThreePointArc((68.11875, -11.9875), (67.966509065, -11.222133135), (67.532963562, -10.573286438))
        make_face()
        with BuildLine():
            Line((64.704536438, -13.401713562), (58.18125, -19.925))
            Line((58.18125, -19.925), (61.96395, -19.925))
            Line((61.96395, -19.925), (74.05625, -19.925))
            Line((74.05625, -19.925), (74.05625, -4.05))
            Line((74.05625, -4.05), (67.532963562, -10.573286438))
            ThreePointArc((67.532963562, -10.573286438), (67.966509065, -11.222133135), (68.11875, -11.9875))
            ThreePointArc((68.11875, -11.9875), (66.884116865, -13.835259065), (64.704536438, -13.401713562))
        make_face()
    extrude(amount=-BOSS_EXTRUDE4_DEPTH)

    # Sketch9 → Boss-Extrude5 (add, up to next)
    with BuildSketch(Plane(origin=(0, 43.1, 0), x_dir=(1, 0, 0), z_dir=(0, 1, 0)), mode=Mode.PRIVATE) as boss_extrude5_sk1:
        with Locations((-55.51425, -11.9875)):
            Rectangle(SKETCH9_W, SKETCH9_H)
    boss_extrude5_tool1 = extrude(boss_extrude5_sk1.sketch, amount=-BOSS_EXTRUDE5_REACH, mode=Mode.PRIVATE) - part_1.part
    add(boss_extrude5_tool1.solids().sort_by_distance((-55.51425, 43.1, 11.9875))[0])

    # Fillet3
    fillet3_edges = [part_1.edges().sort_by_distance(p)[0] for p in [
        (-74.05625, 38.1, 19.925),
        (-74.05625, 38.1, 4.05),
        (74.05625, 38.1, 4.05),
        (74.05625, 38.1, 19.925),
    ]]
    fillet(fillet3_edges, radius=FILLET3_R)

    # Sketch12 → Boss-Extrude6 (add, up to next)
    with BuildSketch(Plane(origin=(0, 43.1, 0), x_dir=(1, 0, 0), z_dir=(0, 1, 0)), mode=Mode.PRIVATE) as boss_extrude6_sk1:
        with Locations((55.51425, -11.9875)):
            Rectangle(SKETCH12_W, SKETCH12_H)
    boss_extrude6_tool1 = extrude(boss_extrude6_sk1.sketch, amount=-BOSS_EXTRUDE6_REACH, mode=Mode.PRIVATE) - part_1.part
    add(boss_extrude6_tool1.solids().sort_by_distance((55.51425, 43.1, 11.9875))[0])

    # M4 Clearance Hole1 (through all)
    with Locations(Plane(origin=(0, 33.1, 0), x_dir=(-1, 0, 0), z_dir=(0, -1, 0))):
        with Locations((66.11875, -11.9875), (-66.11875, -11.9875)):
            Hole(M4_CLEARANCE_HOLE1_D / 2)

    # Sketch13 → Cut-Extrude6 (cut)
    with BuildSketch(Plane.XZ.offset(43.1)):
        with BuildLine():
            Line((5.469338815, 21.930218955), (5.469338815, 10.730218955))
            ThreePointArc((5.469338815, 10.730218955), (3.506954249, 5.992603521), (-1.230661185, 4.030218955))
            Line((-1.230661185, 4.030218955), (-32.230661185, 4.030218955))
            ThreePointArc((-32.230661185, 4.030218955), (-36.968276619, 5.992603521), (-38.930661185, 10.730218955))
            Line((-38.930661185, 10.730218955), (-38.930661185, 21.930218955))
            ThreePointArc((-38.930661185, 21.930218955), (-36.968276619, 26.667834389), (-32.230661185, 28.630218955))
            Line((-32.230661185, 28.630218955), (-21.688826772, 28.630218955))
            Line((-21.688826772, 28.630218955), (-21.513849445, 30.630218955))
            Line((-21.513849445, 30.630218955), (-19.147472925, 30.630218955))
            Line((-19.147472925, 30.630218955), (-18.972495598, 28.630218955))
            Line((-18.972495598, 28.630218955), (-14.488826772, 28.630218955))
            Line((-14.488826772, 28.630218955), (-14.313849445, 30.630218955))
            Line((-14.313849445, 30.630218955), (-11.947472925, 30.630218955))
            Line((-11.947472925, 30.630218955), (-11.772495598, 28.630218955))
            Line((-11.772495598, 28.630218955), (-1.230661185, 28.630218955))
            ThreePointArc((-1.230661185, 28.630218955), (3.506954249, 26.667834389), (5.469338815, 21.930218955))
        make_face()
        with BuildLine():
            Line((40.68125, 21.725), (40.68125, 5.275))
            ThreePointArc((40.68125, 5.275), (40.344422798, 4.461827202), (39.53125, 4.125))
            Line((39.53125, 4.125), (24.58125, 4.125))
            ThreePointArc((24.58125, 4.125), (23.768077202, 4.461827202), (23.43125, 5.275))
            Line((23.43125, 5.275), (23.43125, 21.725))
            ThreePointArc((23.43125, 21.725), (23.768077202, 22.538172798), (24.58125, 22.875))
            Line((24.58125, 22.875), (39.53125, 22.875))
            ThreePointArc((39.53125, 22.875), (40.344422798, 22.538172798), (40.68125, 21.725))
        make_face()
        with BuildLine():
            ThreePointArc((-39.345661185, 27.130218955), (-40.430661185, 28.215218955), (-41.515661185, 27.130218955))
            ThreePointArc((-41.515661185, 27.130218955), (-40.430661185, 26.045218955), (-39.345661185, 27.130218955))
        make_face()
        with BuildLine():
            ThreePointArc((-40.845661185, 9.030218955), (-41.930661185, 10.115218955), (-43.015661185, 9.030218955))
            ThreePointArc((-43.015661185, 9.030218955), (-41.930661185, 7.945218955), (-40.845661185, 9.030218955))
        make_face()
        with BuildLine():
            ThreePointArc((9.554338815, 9.030218955), (8.469338815, 10.115218955), (7.384338815, 9.030218955))
            ThreePointArc((7.384338815, 9.030218955), (8.469338815, 7.945218955), (9.554338815, 9.030218955))
        make_face()
        with BuildLine():
            ThreePointArc((8.054338815, 27.130218955), (6.969338815, 28.215218955), (5.884338815, 27.130218955))
            ThreePointArc((5.884338815, 27.130218955), (6.969338815, 26.045218955), (8.054338815, 27.130218955))
        make_face()
        with Locations(Location((20.05625, 18, 0), (0, 0, 270))):
            Circle(SKETCH13_R)
        with Locations(Location((44.05625, 9, 0), (0, 0, 270))):
            Circle(SKETCH13_R)
    extrude(amount=-CUT_EXTRUDE6_DEPTH, mode=Mode.SUBTRACT)


solid = part_1.part
